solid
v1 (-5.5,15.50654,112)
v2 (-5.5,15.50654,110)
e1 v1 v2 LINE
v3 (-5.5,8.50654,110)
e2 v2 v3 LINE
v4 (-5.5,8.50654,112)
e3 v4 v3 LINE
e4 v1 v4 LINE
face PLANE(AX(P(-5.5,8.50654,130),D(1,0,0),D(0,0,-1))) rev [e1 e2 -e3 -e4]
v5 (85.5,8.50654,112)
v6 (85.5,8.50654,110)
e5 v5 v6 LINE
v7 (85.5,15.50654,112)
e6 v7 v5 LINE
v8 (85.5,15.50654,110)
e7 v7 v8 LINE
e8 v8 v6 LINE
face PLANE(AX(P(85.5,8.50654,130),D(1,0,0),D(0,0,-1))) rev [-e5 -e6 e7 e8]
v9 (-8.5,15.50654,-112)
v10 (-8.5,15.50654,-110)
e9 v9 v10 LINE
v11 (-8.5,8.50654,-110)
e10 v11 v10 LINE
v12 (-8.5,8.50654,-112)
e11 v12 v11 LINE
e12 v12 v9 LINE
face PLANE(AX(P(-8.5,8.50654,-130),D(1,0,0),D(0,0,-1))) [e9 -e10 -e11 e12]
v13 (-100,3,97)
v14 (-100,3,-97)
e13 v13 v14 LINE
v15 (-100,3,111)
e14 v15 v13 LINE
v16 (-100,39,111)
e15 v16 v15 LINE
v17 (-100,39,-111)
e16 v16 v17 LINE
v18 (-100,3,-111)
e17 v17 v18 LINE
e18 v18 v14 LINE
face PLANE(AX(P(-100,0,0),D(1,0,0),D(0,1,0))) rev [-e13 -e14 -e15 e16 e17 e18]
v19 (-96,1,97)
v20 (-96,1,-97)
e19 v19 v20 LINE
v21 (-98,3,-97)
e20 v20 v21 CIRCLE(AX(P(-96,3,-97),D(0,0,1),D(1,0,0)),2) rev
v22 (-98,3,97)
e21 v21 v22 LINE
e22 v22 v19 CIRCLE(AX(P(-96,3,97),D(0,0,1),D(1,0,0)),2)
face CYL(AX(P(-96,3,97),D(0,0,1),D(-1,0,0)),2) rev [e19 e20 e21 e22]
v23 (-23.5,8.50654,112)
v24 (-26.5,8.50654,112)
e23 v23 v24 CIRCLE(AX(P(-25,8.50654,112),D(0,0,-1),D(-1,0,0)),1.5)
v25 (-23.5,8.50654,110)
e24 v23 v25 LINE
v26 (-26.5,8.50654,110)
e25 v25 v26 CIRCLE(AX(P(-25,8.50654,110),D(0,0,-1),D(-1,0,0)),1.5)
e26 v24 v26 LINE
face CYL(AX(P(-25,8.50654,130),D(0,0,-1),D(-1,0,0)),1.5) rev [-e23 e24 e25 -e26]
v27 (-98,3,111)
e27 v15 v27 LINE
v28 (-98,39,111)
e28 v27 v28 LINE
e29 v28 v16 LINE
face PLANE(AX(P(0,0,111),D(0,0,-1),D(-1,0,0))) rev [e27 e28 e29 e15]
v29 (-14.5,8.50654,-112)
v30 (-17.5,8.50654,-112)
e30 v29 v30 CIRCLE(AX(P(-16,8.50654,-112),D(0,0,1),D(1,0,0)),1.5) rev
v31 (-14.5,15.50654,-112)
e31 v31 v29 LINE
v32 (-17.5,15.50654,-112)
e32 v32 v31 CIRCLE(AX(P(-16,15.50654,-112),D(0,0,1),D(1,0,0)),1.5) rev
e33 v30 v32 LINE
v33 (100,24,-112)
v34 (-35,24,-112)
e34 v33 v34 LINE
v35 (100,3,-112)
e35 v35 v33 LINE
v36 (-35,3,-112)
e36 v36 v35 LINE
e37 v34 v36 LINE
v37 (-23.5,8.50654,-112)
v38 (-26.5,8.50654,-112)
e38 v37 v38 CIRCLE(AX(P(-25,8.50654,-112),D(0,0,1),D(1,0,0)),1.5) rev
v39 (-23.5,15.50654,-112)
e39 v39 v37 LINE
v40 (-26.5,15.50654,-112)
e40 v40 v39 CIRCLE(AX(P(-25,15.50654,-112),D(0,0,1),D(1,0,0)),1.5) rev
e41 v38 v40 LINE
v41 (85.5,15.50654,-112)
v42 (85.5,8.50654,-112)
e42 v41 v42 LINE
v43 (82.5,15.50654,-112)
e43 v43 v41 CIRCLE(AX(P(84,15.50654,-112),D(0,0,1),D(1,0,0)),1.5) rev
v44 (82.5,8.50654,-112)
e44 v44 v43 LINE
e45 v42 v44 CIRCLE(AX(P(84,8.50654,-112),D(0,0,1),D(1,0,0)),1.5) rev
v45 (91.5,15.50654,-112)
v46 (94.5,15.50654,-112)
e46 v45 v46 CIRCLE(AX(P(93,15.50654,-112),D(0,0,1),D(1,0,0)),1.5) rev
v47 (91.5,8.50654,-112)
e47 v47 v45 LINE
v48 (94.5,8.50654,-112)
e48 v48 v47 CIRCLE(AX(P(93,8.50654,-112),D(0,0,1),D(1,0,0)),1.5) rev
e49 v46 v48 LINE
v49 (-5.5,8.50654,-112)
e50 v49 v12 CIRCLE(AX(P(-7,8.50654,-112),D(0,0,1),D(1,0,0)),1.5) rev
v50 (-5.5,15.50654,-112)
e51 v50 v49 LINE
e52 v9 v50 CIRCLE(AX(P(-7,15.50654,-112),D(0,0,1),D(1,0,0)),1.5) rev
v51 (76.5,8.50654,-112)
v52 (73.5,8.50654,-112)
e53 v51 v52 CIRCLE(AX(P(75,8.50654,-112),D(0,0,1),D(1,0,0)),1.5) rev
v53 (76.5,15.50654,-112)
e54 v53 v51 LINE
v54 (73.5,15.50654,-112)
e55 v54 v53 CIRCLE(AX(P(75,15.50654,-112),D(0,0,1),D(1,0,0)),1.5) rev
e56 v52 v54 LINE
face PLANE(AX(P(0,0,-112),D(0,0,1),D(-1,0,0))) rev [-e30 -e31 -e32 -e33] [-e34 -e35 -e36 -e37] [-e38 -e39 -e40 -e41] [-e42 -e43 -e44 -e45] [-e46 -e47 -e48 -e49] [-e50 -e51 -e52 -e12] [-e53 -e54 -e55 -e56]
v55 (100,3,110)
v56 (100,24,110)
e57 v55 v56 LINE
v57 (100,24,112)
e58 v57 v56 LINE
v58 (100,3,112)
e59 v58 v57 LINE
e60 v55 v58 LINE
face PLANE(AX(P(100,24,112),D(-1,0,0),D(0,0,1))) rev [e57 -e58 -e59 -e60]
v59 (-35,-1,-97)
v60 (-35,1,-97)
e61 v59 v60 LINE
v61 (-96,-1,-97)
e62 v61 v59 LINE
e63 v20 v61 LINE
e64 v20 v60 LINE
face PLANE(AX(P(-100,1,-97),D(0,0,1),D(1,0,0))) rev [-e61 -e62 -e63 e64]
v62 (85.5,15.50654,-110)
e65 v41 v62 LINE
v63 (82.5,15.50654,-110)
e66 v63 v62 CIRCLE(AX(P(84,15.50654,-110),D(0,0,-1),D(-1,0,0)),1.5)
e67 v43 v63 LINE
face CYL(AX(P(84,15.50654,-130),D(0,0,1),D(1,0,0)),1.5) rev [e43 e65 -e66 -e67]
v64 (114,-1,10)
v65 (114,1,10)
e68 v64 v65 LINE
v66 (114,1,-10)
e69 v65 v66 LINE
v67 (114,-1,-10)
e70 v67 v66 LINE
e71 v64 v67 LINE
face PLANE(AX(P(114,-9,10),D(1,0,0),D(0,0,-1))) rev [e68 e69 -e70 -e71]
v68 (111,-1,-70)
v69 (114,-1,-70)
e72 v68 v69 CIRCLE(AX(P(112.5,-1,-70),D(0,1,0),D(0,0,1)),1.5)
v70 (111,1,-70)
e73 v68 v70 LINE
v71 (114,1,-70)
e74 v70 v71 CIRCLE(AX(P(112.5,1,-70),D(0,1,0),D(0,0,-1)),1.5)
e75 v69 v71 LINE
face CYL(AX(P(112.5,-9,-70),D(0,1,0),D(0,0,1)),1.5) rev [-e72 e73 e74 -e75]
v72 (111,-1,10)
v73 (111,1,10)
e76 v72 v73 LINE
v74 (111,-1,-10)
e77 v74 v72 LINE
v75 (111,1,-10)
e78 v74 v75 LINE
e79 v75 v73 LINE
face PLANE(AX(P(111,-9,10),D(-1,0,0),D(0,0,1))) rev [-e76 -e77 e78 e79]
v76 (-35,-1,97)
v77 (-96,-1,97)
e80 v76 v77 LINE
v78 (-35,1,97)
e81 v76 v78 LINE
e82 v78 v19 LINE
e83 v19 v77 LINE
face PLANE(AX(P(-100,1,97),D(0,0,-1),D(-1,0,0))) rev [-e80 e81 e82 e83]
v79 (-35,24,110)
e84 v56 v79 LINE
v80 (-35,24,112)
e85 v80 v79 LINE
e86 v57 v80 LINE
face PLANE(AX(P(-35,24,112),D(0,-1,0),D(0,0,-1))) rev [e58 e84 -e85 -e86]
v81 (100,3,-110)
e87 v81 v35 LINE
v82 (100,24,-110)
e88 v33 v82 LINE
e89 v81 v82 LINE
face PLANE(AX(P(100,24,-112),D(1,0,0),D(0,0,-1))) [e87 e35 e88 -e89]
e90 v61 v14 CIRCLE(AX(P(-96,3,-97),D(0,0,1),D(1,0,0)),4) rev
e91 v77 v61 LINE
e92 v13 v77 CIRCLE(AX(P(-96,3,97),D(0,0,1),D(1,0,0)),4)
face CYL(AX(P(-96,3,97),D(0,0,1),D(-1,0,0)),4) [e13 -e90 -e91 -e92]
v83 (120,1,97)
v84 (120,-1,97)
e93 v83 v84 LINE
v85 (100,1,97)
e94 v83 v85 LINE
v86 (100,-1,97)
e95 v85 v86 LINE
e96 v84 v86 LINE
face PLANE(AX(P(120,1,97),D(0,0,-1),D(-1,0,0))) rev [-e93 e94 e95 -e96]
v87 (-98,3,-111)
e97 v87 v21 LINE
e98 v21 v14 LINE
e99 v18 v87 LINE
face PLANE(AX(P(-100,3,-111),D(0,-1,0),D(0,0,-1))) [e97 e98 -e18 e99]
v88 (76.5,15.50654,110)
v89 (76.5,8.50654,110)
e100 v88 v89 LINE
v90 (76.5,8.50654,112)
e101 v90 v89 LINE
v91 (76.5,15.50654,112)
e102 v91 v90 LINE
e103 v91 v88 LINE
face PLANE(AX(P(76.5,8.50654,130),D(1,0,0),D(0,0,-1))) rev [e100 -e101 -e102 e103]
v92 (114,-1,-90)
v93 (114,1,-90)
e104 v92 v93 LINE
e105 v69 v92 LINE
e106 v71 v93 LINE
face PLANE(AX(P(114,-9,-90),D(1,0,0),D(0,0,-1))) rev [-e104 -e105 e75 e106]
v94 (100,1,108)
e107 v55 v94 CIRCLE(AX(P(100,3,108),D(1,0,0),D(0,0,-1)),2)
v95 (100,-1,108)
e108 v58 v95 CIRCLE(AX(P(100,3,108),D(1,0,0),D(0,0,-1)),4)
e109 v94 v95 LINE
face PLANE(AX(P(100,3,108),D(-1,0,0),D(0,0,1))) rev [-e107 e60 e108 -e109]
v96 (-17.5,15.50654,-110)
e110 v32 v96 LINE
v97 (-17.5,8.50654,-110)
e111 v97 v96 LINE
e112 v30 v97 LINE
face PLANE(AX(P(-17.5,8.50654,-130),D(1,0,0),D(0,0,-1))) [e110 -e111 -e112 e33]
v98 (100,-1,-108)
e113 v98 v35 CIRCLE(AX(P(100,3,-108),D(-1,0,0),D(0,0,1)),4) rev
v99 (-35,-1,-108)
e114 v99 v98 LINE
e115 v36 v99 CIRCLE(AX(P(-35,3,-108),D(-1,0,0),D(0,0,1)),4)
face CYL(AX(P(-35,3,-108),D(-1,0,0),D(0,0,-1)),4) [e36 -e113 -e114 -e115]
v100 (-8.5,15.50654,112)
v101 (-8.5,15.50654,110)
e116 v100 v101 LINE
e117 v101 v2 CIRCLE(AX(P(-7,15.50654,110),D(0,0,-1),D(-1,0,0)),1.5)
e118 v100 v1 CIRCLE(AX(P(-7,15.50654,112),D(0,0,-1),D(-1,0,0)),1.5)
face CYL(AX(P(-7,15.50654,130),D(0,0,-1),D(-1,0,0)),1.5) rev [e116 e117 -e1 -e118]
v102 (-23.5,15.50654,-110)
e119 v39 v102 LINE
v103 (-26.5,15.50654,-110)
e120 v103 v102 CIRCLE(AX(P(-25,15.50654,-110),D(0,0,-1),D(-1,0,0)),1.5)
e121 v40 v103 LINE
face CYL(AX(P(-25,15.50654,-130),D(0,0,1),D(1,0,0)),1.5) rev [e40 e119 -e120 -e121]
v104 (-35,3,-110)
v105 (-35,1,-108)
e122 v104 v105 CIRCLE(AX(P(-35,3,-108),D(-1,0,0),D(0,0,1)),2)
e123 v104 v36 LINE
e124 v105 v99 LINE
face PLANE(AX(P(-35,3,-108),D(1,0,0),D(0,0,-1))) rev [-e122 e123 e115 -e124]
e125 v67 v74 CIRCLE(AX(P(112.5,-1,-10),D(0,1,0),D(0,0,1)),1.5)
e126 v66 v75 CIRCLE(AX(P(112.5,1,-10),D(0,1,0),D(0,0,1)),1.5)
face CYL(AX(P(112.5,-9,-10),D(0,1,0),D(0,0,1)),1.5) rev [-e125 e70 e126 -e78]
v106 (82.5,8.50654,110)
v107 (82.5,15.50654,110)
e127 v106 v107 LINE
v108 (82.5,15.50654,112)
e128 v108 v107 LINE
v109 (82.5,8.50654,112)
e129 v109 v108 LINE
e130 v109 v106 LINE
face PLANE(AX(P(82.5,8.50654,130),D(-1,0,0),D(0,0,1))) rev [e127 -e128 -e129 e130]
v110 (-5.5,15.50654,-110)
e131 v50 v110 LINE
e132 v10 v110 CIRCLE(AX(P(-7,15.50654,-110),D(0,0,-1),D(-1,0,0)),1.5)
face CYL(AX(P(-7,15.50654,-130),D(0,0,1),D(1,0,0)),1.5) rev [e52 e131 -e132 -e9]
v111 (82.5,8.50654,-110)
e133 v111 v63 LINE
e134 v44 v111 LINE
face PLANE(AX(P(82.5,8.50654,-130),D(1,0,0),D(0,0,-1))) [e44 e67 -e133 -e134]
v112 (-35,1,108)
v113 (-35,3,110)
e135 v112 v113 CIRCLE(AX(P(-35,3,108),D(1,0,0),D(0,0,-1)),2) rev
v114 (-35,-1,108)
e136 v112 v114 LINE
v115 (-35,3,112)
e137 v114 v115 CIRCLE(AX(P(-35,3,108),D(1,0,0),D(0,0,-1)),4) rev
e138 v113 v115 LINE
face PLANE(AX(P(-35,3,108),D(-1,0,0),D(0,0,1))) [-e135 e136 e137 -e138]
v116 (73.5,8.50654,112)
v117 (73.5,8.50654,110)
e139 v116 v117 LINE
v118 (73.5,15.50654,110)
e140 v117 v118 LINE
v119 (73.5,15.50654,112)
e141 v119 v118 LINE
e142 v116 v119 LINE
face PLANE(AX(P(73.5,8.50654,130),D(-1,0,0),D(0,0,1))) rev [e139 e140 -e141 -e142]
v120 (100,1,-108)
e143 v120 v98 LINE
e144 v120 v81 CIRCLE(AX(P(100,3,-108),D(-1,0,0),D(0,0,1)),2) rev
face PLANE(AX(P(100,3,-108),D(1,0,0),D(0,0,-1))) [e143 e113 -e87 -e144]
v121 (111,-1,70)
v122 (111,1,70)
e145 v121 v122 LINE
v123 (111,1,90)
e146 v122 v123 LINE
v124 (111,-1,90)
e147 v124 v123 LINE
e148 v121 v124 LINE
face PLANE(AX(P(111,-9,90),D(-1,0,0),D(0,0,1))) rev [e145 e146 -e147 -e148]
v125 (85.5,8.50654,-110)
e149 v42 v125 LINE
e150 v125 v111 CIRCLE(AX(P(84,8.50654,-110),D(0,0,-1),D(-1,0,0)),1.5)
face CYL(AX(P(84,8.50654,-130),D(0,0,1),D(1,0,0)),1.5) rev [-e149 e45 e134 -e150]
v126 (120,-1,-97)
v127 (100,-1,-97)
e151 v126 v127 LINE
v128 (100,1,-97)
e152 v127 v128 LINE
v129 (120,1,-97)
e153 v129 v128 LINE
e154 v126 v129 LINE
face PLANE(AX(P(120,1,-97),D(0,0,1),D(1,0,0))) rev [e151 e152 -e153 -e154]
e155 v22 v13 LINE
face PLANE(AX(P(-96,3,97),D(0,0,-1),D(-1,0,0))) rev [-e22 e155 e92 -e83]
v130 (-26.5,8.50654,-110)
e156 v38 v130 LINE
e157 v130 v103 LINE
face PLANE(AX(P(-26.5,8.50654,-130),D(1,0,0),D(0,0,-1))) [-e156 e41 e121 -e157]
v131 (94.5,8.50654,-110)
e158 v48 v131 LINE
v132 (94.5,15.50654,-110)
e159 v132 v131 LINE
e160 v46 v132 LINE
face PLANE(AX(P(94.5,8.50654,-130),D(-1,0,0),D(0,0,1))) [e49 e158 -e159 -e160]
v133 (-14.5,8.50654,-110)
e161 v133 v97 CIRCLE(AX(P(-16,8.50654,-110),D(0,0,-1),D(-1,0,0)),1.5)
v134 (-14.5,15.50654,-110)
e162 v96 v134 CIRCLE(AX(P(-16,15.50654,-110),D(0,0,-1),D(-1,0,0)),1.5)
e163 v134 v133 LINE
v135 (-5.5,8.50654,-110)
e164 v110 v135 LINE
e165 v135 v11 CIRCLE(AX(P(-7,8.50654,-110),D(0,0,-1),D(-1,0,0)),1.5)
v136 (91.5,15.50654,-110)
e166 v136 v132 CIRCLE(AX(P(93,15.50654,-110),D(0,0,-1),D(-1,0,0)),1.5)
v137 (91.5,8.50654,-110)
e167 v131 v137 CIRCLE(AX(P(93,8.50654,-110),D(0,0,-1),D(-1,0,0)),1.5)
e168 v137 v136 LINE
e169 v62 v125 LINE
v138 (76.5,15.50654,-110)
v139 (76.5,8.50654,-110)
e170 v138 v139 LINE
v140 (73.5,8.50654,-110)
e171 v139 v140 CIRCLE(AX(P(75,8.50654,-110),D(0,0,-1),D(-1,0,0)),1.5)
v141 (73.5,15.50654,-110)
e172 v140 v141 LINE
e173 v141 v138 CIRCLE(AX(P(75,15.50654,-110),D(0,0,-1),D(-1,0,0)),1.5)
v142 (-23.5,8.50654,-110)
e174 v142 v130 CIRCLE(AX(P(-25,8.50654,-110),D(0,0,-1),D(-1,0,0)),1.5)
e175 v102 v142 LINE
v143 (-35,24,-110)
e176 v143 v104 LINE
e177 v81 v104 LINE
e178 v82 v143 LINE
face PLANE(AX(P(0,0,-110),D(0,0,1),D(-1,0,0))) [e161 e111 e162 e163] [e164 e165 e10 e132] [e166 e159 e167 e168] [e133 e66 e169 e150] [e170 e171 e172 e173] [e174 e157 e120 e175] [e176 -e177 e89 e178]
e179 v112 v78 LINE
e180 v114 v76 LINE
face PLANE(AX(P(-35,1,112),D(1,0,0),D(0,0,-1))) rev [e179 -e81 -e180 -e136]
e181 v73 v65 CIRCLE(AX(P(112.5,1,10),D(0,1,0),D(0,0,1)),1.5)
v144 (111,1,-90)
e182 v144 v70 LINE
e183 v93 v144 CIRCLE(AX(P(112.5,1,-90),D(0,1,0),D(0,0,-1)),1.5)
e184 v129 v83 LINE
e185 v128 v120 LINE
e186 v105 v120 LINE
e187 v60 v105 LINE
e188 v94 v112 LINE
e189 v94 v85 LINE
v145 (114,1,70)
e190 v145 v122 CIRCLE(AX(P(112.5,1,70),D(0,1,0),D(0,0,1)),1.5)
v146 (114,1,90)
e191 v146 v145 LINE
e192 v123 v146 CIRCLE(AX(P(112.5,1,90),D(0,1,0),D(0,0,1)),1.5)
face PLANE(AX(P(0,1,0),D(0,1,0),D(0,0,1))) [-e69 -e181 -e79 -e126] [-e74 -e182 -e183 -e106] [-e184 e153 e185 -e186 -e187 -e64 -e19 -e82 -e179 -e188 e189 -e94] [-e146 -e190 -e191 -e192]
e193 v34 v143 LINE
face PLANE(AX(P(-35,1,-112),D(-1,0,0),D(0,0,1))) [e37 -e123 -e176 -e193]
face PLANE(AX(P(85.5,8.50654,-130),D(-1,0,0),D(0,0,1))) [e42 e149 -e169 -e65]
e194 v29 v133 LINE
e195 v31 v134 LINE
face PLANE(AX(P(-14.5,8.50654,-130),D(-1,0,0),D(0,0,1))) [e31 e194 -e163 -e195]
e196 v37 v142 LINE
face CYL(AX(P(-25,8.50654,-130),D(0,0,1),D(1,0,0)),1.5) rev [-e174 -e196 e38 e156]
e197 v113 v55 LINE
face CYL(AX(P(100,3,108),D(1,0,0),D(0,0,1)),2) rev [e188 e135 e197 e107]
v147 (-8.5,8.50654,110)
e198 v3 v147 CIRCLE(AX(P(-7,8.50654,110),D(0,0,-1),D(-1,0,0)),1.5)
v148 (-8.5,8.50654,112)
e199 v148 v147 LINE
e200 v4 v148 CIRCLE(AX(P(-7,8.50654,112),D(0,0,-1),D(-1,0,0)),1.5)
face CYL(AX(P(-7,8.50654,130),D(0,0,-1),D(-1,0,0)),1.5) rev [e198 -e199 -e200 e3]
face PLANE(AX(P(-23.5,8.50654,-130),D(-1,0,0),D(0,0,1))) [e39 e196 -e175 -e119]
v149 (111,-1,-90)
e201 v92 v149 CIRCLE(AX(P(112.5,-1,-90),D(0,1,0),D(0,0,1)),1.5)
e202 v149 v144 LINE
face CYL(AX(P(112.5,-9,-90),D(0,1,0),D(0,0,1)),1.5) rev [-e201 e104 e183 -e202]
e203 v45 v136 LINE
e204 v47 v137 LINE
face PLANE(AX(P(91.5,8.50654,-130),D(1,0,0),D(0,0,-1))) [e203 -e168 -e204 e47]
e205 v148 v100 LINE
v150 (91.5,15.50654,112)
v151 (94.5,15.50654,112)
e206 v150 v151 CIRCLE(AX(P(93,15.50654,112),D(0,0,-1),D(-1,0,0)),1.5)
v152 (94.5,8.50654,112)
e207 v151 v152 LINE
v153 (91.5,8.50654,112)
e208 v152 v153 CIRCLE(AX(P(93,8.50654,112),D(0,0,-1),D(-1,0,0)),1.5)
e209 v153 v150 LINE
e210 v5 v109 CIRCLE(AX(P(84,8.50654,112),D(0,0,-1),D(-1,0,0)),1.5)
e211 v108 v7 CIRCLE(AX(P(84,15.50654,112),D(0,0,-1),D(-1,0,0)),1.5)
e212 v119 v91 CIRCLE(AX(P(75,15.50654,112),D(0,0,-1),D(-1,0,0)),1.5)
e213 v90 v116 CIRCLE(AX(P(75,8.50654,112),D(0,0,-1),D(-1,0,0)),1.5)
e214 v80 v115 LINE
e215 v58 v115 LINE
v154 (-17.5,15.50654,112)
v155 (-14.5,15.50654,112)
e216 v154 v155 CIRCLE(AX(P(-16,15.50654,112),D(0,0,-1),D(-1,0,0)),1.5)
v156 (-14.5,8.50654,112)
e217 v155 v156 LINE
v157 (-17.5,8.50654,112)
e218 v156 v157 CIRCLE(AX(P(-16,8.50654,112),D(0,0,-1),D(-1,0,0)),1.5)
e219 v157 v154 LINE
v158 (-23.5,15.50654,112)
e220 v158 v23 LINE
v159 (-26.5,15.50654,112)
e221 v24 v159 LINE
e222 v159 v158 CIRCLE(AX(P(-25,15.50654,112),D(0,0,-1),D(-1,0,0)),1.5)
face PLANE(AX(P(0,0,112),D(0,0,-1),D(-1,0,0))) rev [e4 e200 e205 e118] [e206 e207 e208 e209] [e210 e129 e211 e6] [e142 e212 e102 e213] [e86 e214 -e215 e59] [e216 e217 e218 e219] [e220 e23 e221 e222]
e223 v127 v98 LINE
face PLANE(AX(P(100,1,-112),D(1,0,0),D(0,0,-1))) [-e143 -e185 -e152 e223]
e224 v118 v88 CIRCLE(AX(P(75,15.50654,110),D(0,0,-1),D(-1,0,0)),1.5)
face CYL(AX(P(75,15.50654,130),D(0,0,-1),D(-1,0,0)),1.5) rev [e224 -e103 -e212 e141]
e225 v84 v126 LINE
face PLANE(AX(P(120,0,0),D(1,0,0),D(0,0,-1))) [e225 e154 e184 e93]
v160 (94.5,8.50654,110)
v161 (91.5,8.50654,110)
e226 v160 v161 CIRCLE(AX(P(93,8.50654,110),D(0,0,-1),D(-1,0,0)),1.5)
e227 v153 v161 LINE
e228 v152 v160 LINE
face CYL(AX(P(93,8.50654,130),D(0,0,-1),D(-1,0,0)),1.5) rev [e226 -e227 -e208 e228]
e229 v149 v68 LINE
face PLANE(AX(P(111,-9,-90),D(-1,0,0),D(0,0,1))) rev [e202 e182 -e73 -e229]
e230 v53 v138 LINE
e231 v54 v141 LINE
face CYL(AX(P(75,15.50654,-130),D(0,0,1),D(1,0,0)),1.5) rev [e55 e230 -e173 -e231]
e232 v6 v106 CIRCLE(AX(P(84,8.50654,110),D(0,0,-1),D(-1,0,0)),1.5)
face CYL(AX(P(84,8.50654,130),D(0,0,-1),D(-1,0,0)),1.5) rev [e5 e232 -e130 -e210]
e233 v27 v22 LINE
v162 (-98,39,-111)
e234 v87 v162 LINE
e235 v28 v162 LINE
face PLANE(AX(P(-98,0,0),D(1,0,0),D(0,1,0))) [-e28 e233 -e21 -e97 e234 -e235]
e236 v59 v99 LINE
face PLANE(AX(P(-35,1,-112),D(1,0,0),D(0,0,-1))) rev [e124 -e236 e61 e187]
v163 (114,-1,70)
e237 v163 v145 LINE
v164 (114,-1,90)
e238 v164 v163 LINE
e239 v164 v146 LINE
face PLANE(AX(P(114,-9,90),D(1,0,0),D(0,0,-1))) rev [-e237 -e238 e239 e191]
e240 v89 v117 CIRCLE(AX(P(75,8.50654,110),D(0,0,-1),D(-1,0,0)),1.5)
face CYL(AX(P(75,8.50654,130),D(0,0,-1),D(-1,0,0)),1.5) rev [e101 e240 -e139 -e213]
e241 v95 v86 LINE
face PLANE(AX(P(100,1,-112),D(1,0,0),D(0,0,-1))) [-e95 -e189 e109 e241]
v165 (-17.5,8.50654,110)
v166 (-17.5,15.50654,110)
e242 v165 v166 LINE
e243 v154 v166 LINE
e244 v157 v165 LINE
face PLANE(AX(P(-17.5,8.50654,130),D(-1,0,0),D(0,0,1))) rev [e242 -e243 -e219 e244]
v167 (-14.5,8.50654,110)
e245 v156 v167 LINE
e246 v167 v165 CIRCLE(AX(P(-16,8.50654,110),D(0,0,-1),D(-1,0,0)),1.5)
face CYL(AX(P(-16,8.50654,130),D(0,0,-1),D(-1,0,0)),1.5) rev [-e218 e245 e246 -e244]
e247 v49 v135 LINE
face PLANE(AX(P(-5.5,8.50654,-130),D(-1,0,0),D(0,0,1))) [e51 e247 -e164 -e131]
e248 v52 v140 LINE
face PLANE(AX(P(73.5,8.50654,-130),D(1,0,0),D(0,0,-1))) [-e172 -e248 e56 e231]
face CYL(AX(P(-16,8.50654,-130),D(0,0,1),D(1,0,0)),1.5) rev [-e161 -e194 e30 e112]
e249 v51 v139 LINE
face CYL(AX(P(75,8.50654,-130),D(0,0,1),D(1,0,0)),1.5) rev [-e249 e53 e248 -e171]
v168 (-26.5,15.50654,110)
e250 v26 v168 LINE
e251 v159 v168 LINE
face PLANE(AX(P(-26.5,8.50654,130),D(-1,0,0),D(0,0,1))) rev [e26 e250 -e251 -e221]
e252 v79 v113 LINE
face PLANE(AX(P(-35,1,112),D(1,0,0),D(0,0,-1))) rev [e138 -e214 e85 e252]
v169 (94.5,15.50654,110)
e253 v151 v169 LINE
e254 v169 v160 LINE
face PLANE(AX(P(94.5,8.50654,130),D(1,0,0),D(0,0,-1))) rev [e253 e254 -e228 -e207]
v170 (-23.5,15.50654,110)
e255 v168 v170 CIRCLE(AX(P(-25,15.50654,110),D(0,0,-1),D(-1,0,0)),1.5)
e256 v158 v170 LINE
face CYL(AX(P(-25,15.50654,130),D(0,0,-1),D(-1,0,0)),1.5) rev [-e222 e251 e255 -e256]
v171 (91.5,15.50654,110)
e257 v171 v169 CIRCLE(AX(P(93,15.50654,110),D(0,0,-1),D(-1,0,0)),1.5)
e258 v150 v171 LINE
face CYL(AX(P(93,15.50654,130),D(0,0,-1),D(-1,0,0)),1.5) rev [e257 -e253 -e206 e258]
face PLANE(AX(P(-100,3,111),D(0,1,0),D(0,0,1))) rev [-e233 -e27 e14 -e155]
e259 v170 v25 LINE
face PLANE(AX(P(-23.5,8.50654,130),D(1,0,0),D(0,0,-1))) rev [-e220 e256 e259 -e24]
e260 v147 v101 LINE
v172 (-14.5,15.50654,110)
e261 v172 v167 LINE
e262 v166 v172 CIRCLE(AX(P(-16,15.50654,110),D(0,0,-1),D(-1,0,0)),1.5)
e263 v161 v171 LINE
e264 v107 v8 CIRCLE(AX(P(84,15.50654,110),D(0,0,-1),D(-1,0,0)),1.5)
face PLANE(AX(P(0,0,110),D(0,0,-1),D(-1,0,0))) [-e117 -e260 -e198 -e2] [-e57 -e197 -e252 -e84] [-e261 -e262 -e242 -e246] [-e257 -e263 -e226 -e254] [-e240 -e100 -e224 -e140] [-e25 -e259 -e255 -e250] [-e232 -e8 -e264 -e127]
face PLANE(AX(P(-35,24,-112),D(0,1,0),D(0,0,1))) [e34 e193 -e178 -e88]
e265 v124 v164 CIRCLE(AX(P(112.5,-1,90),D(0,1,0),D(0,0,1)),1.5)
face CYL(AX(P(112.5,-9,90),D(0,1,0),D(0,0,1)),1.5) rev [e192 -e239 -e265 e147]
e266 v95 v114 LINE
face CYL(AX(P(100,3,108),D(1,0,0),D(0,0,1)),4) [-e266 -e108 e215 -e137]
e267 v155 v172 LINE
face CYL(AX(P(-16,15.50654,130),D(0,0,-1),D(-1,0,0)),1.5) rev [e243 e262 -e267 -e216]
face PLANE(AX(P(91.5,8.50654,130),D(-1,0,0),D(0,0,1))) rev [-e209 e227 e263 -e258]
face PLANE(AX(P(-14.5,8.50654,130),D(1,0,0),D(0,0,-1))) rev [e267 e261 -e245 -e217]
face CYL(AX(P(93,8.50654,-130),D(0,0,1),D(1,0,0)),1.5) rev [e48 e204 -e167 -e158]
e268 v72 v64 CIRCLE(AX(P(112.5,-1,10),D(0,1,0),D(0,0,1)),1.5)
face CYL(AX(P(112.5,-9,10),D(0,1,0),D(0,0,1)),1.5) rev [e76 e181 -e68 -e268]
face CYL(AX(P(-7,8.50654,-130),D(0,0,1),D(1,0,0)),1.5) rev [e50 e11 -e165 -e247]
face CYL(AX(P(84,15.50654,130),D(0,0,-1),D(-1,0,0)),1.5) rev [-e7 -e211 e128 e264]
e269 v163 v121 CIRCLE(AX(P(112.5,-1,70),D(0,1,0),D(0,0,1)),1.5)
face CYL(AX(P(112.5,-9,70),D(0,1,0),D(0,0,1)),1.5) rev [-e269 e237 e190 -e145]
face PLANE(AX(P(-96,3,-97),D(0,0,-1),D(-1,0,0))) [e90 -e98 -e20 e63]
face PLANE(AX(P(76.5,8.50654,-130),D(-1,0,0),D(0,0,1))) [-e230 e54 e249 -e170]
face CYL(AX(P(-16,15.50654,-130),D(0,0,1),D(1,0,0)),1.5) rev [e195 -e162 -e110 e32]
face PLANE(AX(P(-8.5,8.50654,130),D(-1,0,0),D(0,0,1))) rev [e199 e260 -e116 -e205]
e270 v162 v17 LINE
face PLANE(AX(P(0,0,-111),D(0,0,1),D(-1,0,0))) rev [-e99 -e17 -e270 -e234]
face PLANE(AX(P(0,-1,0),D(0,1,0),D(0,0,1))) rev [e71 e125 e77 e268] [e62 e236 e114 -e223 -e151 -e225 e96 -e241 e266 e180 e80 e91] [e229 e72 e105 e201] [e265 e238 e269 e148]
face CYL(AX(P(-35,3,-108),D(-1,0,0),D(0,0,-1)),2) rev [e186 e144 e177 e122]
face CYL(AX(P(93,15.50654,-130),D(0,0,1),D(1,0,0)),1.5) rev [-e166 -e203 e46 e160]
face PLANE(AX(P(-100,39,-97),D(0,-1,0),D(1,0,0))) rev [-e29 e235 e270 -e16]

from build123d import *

# Parameters (mm, degrees)
SKETCH1_W                    = 200
SKETCH1_H                    = 224
BOSS_EXTRUDE1_DEPTH          = 1
SKETCH41_W                   = 65
SKETCH41_H                   = 15
CUT_EXTRUDE2_DEPTH           = 40
EDGE_FLANGE1_STRIP_W         = 12
EDGE_FLANGE1_STRIP_H         = 2
EDGE_FLANGE1_STRIP_CUT_DEPTH = 135
EDGE_FLANGE1_DEPTH           = 135
SKETCH53_W                   = 194
SKETCH53_H                   = 2
BOSS_EXTRUDE2_DEPTH          = 20
CUT_EXTRUDE3_DEPTH           = 20
EDGE_FLANGE3_STRIP_W         = 12
EDGE_FLANGE3_STRIP_H         = 2
EDGE_FLANGE3_STRIP_CUT_DEPTH = 194
EDGE_FLANGE3_DEPTH           = 194
SKETCH58_W                   = 2
SKETCH58_H                   = 36
BOSS_EXTRUDE3_DEPTH          = 14
CUT_EXTRUDE4_DEPTH           = 10


# Sheet-metal steps are written as plain solids
with BuildPart() as part:
    # Sketch1 → Boss-Extrude1 (new, symmetric)
    with BuildSketch(Plane(origin=(0, 0, 0), x_dir=(1, 0, 0), z_dir=(0, 1, 0))):
        Rectangle(SKETCH1_W, SKETCH1_H)
    extrude(amount=BOSS_EXTRUDE1_DEPTH, both=True)

    # Sketch41 → Cut-Extrude2 (cut)
    with BuildSketch(Plane(origin=(0, 1, 0), x_dir=(1, 0, 0), z_dir=(0, 1, 0))):
        with Locations((-67.5, -104.5)):
            Rectangle(SKETCH41_W, SKETCH41_H)
        with Locations((-67.5, 104.5)):
            Rectangle(SKETCH41_W, SKETCH41_H)
    extrude(amount=-CUT_EXTRUDE2_DEPTH, mode=Mode.SUBTRACT)

    # Edge-Flange1 strip (across the edge) → Edge-Flange1 strip cut (cut)
    with BuildSketch(Plane(origin=(-35, 1, 112), x_dir=(0, 0, -1), z_dir=(1, 0, 0))):
        with Locations((-2, -1)):
            Rectangle(EDGE_FLANGE1_STRIP_W, EDGE_FLANGE1_STRIP_H)
    edge_flange1_strip_cut = extrude(amount=EDGE_FLANGE1_STRIP_CUT_DEPTH, mode=Mode.SUBTRACT)

    # Edge-Flange1 section (across the edge) → Edge-Flange1 (add)
    with BuildSketch(Plane(origin=(-35, 1, 112), x_dir=(0, 0, -1), z_dir=(1, 0, 0))):
        with BuildLine():
            Line((0, 2), (0, 23))
            Line((0, 23), (2, 23))
            Line((2, 23), (2, 2))
            ThreePointArc((2, 2), (2.585786438, 0.585786438), (4, 0))
            Line((4, 0), (4, -2))
            ThreePointArc((4, -2), (1.171572875, -0.828427125), (0, 2))
        make_face()
    edge_flange1 = extrude(amount=EDGE_FLANGE1_DEPTH)

    # Mirror1: Edge-Flange1 strip cut, Edge-Flange1 across plane
    add(edge_flange1_strip_cut.mirror(Plane.XY), mode=Mode.SUBTRACT)
    add(edge_flange1.mirror(Plane.XY))

    # Sketch53 → Boss-Extrude2 (add)
    with BuildSketch(Plane(origin=(100, 0, 0), x_dir=(0, 0, -1), z_dir=(1, 0, 0))):
        Rectangle(SKETCH53_W, SKETCH53_H)
    extrude(amount=BOSS_EXTRUDE2_DEPTH)

    # Sketch54 → Cut-Extrude3 (cut)
    with BuildSketch(Plane(origin=(0, 0, 110), x_dir=(-1, 0, 0), z_dir=(0, 0, -1))):
        with BuildLine():
            Line((-94.5, 8.506539698), (-94.5, 15.506539698))
            ThreePointArc((-94.5, 15.506539698), (-93, 17.006539698), (-91.5, 15.506539698))
            Line((-91.5, 15.506539698), (-91.5, 8.506539698))
            ThreePointArc((-91.5, 8.506539698), (-93, 7.006539698), (-94.5, 8.506539698))
        make_face()
        with BuildLine():
            Line((-85.5, 8.506539698), (-85.5, 15.506539698))
            ThreePointArc((-85.5, 15.506539698), (-84, 17.006539698), (-82.5, 15.506539698))
            Line((-82.5, 15.506539698), (-82.5, 8.506539698))
            ThreePointArc((-82.5, 8.506539698), (-84, 7.006539698), (-85.5, 8.506539698))
        make_face()
        with BuildLine():
            Line((-76.5, 8.506539698), (-76.5, 15.506539698))
            ThreePointArc((-76.5, 15.506539698), (-75, 17.006539698), (-73.5, 15.506539698))
            Line((-73.5, 15.506539698), (-73.5, 8.506539698))
            ThreePointArc((-73.5, 8.506539698), (-75, 7.006539698), (-76.5, 8.506539698))
        make_face()
        with BuildLine():
            Line((14.5, 8.506539698), (14.5, 15.506539698))
            ThreePointArc((14.5, 15.506539698), (16, 17.006539698), (17.5, 15.506539698))
            Line((17.5, 15.506539698), (17.5, 8.506539698))
            ThreePointArc((17.5, 8.506539698), (16, 7.006539698), (14.5, 8.506539698))
        make_face()
        with BuildLine():
            Line((5.5, 8.506539698), (5.5, 15.506539698))
            ThreePointArc((5.5, 15.506539698), (7, 17.006539698), (8.5, 15.506539698))
            Line((8.5, 15.506539698), (8.5, 8.506539698))
            ThreePointArc((8.5, 8.506539698), (7, 7.006539698), (5.5, 8.506539698))
        make_face()
        with BuildLine():
            Line((23.5, 8.506539698), (23.5, 15.506539698))
            ThreePointArc((23.5, 15.506539698), (25, 17.006539698), (26.5, 15.506539698))
            Line((26.5, 15.506539698), (26.5, 8.506539698))
            ThreePointArc((26.5, 8.506539698), (25, 7.006539698), (23.5, 8.506539698))
        make_face()
    cut_extrude3 = extrude(amount=-CUT_EXTRUDE3_DEPTH, mode=Mode.SUBTRACT)

    # Edge-Flange3 strip (across the edge) → Edge-Flange3 strip cut (cut)
    with BuildSketch(Plane(origin=(-100, 1, -97), x_dir=(1, 0, 0), z_dir=(0, 0, 1))):
        with Locations((-2, -1)):
            Rectangle(EDGE_FLANGE3_STRIP_W, EDGE_FLANGE3_STRIP_H)
    extrude(amount=EDGE_FLANGE3_STRIP_CUT_DEPTH, mode=Mode.SUBTRACT)

    # Edge-Flange3 section (across the edge) → Edge-Flange3 (add)
    with BuildSketch(Plane(origin=(-100, 1, -97), x_dir=(1, 0, 0), z_dir=(0, 0, 1))):
        with BuildLine():
            Line((0, 2), (0, 38))
            Line((0, 38), (2, 38))
            Line((2, 38), (2, 2))
            ThreePointArc((2, 2), (2.585786438, 0.585786438), (4, 0))
            Line((4, 0), (4, -2))
            ThreePointArc((4, -2), (1.171572875, -0.828427125), (0, 2))
        make_face()
    extrude(amount=EDGE_FLANGE3_DEPTH)

    # Sketch58 → Boss-Extrude3 (add)
    with BuildSketch(Plane.XY.offset(97)):
        with Locations((-99, 21)):
            Rectangle(SKETCH58_W, SKETCH58_H)
    boss_extrude3 = extrude(amount=BOSS_EXTRUDE3_DEPTH)

    # Mirror2: Cut-Extrude3, Boss-Extrude3 across plane
    add(cut_extrude3.mirror(Plane.XY), mode=Mode.SUBTRACT)
    add(boss_extrude3.mirror(Plane.XY))

    # Sketch59 → Cut-Extrude4 (cut)
    with BuildSketch(Plane(origin=(0, 1, 0), x_dir=(1, 0, 0), z_dir=(0, 1, 0))):
        with BuildLine():
            Line((111, -90), (111, -70))
            ThreePointArc((111, -70), (112.5, -68.5), (114, -70))
            Line((114, -70), (114, -90))
            ThreePointArc((114, -90), (112.5, -91.5), (111, -90))
        make_face()
        with BuildLine():
            Line((111, -10), (111, 10))
            ThreePointArc((111, 10), (112.5, 11.5), (114, 10))
            Line((114, 10), (114, -10))
            ThreePointArc((114, -10), (112.5, -11.5), (111, -10))
        make_face()
        with BuildLine():
            Line((111, 90), (111, 70))
            ThreePointArc((111, 70), (112.5, 68.5), (114, 70))
            Line((114, 70), (114, 90))
            ThreePointArc((114, 90), (112.5, 91.5), (111, 90))
        make_face()
    extrude(amount=-CUT_EXTRUDE4_DEPTH, mode=Mode.SUBTRACT)


solid = part.part
